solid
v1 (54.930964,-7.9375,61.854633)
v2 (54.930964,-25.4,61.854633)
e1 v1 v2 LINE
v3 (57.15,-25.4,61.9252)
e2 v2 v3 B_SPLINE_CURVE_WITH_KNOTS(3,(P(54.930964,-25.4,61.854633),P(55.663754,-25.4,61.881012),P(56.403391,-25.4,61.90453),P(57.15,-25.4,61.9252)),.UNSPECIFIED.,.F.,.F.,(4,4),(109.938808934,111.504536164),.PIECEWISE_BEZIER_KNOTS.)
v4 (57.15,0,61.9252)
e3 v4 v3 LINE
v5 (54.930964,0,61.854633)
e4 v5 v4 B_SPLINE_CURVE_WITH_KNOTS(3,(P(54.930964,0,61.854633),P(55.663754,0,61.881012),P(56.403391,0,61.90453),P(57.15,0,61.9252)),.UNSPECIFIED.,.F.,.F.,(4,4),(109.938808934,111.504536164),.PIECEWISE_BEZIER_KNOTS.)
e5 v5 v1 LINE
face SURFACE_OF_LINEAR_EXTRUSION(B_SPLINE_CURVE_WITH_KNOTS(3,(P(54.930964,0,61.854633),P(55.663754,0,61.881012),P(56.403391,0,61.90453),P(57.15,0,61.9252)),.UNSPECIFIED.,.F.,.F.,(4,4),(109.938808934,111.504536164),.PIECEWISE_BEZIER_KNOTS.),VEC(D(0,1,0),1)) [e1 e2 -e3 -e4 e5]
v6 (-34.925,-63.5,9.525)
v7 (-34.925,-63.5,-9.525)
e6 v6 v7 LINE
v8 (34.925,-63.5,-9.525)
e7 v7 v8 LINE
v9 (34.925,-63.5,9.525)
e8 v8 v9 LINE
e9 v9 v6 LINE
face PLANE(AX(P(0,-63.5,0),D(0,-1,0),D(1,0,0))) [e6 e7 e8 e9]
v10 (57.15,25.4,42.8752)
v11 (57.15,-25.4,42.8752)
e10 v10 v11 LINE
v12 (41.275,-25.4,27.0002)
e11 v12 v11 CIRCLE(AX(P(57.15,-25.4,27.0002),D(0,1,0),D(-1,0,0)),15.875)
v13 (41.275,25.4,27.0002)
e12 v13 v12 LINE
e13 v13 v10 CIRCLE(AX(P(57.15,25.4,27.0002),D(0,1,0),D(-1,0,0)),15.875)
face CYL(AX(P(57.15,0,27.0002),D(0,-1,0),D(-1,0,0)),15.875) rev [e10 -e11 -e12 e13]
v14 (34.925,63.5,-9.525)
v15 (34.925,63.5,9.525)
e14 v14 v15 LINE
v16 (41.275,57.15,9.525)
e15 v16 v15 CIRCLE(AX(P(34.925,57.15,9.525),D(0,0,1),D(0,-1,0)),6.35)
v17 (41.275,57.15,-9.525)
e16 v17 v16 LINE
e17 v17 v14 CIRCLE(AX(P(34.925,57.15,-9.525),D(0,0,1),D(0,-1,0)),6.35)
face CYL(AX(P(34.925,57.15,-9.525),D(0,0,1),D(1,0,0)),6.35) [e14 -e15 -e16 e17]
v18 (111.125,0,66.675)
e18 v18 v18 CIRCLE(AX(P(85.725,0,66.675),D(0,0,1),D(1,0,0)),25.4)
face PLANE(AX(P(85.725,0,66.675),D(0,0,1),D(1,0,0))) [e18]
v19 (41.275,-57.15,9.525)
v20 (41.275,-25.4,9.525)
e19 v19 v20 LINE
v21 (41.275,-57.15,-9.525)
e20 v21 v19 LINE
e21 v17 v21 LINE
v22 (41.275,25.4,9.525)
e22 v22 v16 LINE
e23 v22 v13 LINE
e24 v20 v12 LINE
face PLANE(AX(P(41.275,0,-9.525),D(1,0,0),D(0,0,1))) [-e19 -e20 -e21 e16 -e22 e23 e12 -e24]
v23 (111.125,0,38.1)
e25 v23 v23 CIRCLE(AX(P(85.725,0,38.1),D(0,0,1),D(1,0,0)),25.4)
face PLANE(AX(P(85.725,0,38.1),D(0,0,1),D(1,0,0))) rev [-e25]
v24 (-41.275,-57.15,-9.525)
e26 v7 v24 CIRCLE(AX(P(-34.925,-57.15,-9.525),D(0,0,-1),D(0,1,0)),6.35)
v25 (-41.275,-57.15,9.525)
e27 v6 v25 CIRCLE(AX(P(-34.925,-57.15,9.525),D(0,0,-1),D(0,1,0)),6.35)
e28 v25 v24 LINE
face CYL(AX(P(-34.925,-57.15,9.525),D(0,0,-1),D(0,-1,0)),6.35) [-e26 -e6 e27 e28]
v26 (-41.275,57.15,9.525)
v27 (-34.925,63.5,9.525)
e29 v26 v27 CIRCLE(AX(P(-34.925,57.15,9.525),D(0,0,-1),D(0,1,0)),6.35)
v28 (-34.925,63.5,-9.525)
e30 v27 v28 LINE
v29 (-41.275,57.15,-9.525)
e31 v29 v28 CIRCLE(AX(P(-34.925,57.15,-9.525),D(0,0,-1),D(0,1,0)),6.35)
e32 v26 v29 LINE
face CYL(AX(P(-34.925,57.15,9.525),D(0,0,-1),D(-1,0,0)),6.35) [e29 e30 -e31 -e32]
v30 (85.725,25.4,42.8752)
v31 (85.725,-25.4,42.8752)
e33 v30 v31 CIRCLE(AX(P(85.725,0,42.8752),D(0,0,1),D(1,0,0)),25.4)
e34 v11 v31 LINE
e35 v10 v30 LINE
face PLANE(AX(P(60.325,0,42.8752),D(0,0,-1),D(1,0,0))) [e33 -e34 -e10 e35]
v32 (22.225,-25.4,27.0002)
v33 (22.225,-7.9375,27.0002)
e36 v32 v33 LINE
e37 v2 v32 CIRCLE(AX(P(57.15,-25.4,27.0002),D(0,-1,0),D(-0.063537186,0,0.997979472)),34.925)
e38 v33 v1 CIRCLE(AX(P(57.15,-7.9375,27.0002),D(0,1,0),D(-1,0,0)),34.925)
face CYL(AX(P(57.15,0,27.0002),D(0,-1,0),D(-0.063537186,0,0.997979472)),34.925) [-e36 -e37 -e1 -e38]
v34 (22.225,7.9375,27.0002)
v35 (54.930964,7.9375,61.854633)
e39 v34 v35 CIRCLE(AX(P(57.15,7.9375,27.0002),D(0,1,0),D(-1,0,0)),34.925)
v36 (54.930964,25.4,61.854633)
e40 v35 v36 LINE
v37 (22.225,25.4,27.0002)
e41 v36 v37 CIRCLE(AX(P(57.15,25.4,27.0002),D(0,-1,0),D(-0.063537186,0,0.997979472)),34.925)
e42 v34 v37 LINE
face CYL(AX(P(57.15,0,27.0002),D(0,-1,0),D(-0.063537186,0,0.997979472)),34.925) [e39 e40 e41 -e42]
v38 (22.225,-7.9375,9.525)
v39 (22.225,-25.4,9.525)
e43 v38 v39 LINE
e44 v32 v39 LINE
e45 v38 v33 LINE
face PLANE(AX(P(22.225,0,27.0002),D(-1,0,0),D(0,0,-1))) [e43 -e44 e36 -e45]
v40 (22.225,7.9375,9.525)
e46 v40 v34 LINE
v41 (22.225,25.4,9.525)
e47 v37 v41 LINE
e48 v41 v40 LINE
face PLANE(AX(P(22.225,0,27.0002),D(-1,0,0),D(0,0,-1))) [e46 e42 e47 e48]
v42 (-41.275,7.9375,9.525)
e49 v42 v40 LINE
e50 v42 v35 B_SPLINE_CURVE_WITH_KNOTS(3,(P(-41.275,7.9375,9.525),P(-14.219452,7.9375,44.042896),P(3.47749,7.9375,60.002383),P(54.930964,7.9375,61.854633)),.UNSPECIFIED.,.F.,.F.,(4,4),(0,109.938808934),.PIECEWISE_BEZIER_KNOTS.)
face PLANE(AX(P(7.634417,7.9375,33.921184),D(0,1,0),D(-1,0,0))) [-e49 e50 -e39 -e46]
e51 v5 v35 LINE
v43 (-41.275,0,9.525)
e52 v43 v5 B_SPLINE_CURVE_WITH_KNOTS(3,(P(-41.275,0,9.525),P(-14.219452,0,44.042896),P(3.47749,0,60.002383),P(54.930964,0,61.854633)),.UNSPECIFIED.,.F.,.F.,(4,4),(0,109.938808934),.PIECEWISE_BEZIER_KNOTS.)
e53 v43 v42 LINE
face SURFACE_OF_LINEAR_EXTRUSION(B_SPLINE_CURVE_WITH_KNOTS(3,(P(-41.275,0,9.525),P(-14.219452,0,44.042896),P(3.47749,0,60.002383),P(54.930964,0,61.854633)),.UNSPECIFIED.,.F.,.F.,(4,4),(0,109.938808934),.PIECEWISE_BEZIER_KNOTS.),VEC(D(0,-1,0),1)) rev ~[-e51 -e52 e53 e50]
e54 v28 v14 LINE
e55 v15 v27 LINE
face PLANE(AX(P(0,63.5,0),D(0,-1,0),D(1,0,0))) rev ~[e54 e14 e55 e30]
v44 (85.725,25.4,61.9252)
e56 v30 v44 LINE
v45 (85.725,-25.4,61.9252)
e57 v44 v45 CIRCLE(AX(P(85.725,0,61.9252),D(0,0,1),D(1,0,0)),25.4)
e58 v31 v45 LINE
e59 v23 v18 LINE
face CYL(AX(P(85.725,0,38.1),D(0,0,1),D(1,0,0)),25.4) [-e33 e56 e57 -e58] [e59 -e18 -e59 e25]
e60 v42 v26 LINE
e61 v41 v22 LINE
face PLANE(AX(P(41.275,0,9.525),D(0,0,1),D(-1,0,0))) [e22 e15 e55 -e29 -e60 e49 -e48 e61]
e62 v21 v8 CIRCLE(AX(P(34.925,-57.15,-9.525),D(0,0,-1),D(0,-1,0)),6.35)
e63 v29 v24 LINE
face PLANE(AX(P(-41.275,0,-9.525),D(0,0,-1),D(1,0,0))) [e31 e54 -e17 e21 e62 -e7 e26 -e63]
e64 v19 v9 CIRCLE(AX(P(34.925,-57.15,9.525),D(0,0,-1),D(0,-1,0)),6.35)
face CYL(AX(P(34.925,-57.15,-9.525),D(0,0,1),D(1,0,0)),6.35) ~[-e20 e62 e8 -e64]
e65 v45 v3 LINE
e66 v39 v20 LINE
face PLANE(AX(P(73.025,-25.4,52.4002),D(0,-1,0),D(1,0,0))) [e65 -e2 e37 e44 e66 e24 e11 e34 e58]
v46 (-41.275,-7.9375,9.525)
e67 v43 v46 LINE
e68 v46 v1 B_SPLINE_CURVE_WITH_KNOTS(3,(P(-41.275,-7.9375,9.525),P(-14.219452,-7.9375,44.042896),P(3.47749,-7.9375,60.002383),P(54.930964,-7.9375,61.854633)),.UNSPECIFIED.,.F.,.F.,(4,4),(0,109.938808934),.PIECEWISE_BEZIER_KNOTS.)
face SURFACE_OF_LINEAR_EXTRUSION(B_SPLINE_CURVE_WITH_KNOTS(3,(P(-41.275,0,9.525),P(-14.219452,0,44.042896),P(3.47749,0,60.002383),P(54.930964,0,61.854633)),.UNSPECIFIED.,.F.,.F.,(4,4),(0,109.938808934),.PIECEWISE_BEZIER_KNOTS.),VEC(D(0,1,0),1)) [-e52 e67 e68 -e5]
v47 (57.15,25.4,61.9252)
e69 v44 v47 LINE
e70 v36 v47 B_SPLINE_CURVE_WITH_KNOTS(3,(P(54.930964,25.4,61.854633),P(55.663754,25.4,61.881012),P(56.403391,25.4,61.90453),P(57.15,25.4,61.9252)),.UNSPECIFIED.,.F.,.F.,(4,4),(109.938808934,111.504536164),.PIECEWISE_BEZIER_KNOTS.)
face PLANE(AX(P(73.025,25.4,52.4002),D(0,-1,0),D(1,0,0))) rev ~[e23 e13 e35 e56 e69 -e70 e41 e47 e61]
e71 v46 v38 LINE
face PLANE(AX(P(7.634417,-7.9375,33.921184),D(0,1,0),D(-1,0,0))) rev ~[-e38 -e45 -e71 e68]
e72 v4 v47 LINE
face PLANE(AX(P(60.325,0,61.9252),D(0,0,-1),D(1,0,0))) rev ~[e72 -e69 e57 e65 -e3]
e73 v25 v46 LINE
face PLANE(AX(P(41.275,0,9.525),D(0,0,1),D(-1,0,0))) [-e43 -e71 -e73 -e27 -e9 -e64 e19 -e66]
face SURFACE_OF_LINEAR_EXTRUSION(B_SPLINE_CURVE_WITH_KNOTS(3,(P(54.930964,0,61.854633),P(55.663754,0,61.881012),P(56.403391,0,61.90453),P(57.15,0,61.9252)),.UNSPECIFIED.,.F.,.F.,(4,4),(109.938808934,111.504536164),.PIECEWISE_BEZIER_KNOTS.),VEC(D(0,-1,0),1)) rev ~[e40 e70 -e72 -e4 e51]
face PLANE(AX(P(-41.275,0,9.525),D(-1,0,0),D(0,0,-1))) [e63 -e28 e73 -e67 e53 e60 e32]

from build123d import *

# Parameters (mm, degrees)
F1_DEPTH = 63.5
F2_DEPTH = 25.4
F3_DEPTH = 7.9375
F0_W     = 25.4
F0_H     = 19.05
F4_DEPTH = 25.4
F6_R     = 6.35


with BuildPart() as f1:
    # F0 (on Front) → F1 (new body, symmetric)
    with BuildSketch(Plane.XZ):
        Polygon((22.225, 9.525), (-41.275, 9.525), (-41.275, -9.525), (41.275, -9.525), (41.275, 9.525), align=None)
    extrude(amount=F1_DEPTH, both=True)

    # F0 (on Front) → F2 (join, symmetric)
    with BuildSketch(Plane.XZ):
        with BuildLine():
            Line((22.225, 27.0002), (22.225, 9.525))
            Line((22.225, 9.525), (41.275, 9.525))
            Line((41.275, 9.525), (41.275, 27.0002))
            ThreePointArc((41.275, 27.0002), (45.9246798487, 38.2255201513), (57.15, 42.8752))
            Line((57.15, 42.8752), (60.325, 42.8752))
            Line((60.325, 42.8752), (60.325, 61.9252))
            Line((60.325, 61.9252), (57.15, 61.9252))
            add(Edge.make_bspline(
                [(54.9309637921, 61.854633051), (55.6637542078, 61.8810124388), (56.4033914289, 61.9045304692), (57.15, 61.9252)],
                knots=[109.9388089339, 109.9388089339, 109.9388089339, 109.9388089339, 111.5045361635, 111.5045361635, 111.5045361635, 111.5045361635], degree=3))
            ThreePointArc((54.9309637921, 61.854633051), (31.6818290354, 50.8984822127), (22.225, 27.0002))
        make_face()
    extrude(amount=F2_DEPTH, both=True)

    # F0 (on Front) → F3 (join, symmetric)
    with BuildSketch(Plane.XZ):
        with BuildLine():
            add(Edge.make_bspline(
                [(-41.275, 9.525), (-14.2194517609, 44.0428960459), (3.4774896668, 60.0023829163), (54.9309637921, 61.854633051)],
                knots=[0, 0, 0, 0, 109.9388089339, 109.9388089339, 109.9388089339, 109.9388089339], degree=3))
            Line((-41.275, 9.525), (22.225, 9.525))
            Line((22.225, 9.525), (22.225, 27.0002))
            ThreePointArc((22.225, 27.0002), (31.6818290354, 50.8984822127), (54.9309637921, 61.854633051))
        make_face()
    extrude(amount=F3_DEPTH, both=True)

    # F0 (on Front) → F4 (join, symmetric)
    with BuildSketch(Plane.XZ):
        with Locations((73.025, 52.4002)):
            Rectangle(F0_W, F0_H)
    extrude(amount=F4_DEPTH, both=True)

    # F0 (on Front) → F5 (revolve)
    with BuildSketch(Plane.XZ):
        Polygon((85.725, 66.675), (85.725, 61.9252), (85.725, 42.8752), (85.725, 38.1), (111.125, 38.1), (111.125, 66.675), align=None)
    revolve(axis=Axis((85.725, 0, 52.3875), (0, 0, 1)))

    # F6
    f6_edges = [f1.edges().sort_by_distance(p)[0] for p in [
        (41.275, -63.5, 0),
        (-41.275, -63.5, 0),
        (41.275, 63.5, 0),
        (-41.275, 63.5, 0),
    ]]
    fillet(f6_edges, radius=F6_R)


solid = f1.part
